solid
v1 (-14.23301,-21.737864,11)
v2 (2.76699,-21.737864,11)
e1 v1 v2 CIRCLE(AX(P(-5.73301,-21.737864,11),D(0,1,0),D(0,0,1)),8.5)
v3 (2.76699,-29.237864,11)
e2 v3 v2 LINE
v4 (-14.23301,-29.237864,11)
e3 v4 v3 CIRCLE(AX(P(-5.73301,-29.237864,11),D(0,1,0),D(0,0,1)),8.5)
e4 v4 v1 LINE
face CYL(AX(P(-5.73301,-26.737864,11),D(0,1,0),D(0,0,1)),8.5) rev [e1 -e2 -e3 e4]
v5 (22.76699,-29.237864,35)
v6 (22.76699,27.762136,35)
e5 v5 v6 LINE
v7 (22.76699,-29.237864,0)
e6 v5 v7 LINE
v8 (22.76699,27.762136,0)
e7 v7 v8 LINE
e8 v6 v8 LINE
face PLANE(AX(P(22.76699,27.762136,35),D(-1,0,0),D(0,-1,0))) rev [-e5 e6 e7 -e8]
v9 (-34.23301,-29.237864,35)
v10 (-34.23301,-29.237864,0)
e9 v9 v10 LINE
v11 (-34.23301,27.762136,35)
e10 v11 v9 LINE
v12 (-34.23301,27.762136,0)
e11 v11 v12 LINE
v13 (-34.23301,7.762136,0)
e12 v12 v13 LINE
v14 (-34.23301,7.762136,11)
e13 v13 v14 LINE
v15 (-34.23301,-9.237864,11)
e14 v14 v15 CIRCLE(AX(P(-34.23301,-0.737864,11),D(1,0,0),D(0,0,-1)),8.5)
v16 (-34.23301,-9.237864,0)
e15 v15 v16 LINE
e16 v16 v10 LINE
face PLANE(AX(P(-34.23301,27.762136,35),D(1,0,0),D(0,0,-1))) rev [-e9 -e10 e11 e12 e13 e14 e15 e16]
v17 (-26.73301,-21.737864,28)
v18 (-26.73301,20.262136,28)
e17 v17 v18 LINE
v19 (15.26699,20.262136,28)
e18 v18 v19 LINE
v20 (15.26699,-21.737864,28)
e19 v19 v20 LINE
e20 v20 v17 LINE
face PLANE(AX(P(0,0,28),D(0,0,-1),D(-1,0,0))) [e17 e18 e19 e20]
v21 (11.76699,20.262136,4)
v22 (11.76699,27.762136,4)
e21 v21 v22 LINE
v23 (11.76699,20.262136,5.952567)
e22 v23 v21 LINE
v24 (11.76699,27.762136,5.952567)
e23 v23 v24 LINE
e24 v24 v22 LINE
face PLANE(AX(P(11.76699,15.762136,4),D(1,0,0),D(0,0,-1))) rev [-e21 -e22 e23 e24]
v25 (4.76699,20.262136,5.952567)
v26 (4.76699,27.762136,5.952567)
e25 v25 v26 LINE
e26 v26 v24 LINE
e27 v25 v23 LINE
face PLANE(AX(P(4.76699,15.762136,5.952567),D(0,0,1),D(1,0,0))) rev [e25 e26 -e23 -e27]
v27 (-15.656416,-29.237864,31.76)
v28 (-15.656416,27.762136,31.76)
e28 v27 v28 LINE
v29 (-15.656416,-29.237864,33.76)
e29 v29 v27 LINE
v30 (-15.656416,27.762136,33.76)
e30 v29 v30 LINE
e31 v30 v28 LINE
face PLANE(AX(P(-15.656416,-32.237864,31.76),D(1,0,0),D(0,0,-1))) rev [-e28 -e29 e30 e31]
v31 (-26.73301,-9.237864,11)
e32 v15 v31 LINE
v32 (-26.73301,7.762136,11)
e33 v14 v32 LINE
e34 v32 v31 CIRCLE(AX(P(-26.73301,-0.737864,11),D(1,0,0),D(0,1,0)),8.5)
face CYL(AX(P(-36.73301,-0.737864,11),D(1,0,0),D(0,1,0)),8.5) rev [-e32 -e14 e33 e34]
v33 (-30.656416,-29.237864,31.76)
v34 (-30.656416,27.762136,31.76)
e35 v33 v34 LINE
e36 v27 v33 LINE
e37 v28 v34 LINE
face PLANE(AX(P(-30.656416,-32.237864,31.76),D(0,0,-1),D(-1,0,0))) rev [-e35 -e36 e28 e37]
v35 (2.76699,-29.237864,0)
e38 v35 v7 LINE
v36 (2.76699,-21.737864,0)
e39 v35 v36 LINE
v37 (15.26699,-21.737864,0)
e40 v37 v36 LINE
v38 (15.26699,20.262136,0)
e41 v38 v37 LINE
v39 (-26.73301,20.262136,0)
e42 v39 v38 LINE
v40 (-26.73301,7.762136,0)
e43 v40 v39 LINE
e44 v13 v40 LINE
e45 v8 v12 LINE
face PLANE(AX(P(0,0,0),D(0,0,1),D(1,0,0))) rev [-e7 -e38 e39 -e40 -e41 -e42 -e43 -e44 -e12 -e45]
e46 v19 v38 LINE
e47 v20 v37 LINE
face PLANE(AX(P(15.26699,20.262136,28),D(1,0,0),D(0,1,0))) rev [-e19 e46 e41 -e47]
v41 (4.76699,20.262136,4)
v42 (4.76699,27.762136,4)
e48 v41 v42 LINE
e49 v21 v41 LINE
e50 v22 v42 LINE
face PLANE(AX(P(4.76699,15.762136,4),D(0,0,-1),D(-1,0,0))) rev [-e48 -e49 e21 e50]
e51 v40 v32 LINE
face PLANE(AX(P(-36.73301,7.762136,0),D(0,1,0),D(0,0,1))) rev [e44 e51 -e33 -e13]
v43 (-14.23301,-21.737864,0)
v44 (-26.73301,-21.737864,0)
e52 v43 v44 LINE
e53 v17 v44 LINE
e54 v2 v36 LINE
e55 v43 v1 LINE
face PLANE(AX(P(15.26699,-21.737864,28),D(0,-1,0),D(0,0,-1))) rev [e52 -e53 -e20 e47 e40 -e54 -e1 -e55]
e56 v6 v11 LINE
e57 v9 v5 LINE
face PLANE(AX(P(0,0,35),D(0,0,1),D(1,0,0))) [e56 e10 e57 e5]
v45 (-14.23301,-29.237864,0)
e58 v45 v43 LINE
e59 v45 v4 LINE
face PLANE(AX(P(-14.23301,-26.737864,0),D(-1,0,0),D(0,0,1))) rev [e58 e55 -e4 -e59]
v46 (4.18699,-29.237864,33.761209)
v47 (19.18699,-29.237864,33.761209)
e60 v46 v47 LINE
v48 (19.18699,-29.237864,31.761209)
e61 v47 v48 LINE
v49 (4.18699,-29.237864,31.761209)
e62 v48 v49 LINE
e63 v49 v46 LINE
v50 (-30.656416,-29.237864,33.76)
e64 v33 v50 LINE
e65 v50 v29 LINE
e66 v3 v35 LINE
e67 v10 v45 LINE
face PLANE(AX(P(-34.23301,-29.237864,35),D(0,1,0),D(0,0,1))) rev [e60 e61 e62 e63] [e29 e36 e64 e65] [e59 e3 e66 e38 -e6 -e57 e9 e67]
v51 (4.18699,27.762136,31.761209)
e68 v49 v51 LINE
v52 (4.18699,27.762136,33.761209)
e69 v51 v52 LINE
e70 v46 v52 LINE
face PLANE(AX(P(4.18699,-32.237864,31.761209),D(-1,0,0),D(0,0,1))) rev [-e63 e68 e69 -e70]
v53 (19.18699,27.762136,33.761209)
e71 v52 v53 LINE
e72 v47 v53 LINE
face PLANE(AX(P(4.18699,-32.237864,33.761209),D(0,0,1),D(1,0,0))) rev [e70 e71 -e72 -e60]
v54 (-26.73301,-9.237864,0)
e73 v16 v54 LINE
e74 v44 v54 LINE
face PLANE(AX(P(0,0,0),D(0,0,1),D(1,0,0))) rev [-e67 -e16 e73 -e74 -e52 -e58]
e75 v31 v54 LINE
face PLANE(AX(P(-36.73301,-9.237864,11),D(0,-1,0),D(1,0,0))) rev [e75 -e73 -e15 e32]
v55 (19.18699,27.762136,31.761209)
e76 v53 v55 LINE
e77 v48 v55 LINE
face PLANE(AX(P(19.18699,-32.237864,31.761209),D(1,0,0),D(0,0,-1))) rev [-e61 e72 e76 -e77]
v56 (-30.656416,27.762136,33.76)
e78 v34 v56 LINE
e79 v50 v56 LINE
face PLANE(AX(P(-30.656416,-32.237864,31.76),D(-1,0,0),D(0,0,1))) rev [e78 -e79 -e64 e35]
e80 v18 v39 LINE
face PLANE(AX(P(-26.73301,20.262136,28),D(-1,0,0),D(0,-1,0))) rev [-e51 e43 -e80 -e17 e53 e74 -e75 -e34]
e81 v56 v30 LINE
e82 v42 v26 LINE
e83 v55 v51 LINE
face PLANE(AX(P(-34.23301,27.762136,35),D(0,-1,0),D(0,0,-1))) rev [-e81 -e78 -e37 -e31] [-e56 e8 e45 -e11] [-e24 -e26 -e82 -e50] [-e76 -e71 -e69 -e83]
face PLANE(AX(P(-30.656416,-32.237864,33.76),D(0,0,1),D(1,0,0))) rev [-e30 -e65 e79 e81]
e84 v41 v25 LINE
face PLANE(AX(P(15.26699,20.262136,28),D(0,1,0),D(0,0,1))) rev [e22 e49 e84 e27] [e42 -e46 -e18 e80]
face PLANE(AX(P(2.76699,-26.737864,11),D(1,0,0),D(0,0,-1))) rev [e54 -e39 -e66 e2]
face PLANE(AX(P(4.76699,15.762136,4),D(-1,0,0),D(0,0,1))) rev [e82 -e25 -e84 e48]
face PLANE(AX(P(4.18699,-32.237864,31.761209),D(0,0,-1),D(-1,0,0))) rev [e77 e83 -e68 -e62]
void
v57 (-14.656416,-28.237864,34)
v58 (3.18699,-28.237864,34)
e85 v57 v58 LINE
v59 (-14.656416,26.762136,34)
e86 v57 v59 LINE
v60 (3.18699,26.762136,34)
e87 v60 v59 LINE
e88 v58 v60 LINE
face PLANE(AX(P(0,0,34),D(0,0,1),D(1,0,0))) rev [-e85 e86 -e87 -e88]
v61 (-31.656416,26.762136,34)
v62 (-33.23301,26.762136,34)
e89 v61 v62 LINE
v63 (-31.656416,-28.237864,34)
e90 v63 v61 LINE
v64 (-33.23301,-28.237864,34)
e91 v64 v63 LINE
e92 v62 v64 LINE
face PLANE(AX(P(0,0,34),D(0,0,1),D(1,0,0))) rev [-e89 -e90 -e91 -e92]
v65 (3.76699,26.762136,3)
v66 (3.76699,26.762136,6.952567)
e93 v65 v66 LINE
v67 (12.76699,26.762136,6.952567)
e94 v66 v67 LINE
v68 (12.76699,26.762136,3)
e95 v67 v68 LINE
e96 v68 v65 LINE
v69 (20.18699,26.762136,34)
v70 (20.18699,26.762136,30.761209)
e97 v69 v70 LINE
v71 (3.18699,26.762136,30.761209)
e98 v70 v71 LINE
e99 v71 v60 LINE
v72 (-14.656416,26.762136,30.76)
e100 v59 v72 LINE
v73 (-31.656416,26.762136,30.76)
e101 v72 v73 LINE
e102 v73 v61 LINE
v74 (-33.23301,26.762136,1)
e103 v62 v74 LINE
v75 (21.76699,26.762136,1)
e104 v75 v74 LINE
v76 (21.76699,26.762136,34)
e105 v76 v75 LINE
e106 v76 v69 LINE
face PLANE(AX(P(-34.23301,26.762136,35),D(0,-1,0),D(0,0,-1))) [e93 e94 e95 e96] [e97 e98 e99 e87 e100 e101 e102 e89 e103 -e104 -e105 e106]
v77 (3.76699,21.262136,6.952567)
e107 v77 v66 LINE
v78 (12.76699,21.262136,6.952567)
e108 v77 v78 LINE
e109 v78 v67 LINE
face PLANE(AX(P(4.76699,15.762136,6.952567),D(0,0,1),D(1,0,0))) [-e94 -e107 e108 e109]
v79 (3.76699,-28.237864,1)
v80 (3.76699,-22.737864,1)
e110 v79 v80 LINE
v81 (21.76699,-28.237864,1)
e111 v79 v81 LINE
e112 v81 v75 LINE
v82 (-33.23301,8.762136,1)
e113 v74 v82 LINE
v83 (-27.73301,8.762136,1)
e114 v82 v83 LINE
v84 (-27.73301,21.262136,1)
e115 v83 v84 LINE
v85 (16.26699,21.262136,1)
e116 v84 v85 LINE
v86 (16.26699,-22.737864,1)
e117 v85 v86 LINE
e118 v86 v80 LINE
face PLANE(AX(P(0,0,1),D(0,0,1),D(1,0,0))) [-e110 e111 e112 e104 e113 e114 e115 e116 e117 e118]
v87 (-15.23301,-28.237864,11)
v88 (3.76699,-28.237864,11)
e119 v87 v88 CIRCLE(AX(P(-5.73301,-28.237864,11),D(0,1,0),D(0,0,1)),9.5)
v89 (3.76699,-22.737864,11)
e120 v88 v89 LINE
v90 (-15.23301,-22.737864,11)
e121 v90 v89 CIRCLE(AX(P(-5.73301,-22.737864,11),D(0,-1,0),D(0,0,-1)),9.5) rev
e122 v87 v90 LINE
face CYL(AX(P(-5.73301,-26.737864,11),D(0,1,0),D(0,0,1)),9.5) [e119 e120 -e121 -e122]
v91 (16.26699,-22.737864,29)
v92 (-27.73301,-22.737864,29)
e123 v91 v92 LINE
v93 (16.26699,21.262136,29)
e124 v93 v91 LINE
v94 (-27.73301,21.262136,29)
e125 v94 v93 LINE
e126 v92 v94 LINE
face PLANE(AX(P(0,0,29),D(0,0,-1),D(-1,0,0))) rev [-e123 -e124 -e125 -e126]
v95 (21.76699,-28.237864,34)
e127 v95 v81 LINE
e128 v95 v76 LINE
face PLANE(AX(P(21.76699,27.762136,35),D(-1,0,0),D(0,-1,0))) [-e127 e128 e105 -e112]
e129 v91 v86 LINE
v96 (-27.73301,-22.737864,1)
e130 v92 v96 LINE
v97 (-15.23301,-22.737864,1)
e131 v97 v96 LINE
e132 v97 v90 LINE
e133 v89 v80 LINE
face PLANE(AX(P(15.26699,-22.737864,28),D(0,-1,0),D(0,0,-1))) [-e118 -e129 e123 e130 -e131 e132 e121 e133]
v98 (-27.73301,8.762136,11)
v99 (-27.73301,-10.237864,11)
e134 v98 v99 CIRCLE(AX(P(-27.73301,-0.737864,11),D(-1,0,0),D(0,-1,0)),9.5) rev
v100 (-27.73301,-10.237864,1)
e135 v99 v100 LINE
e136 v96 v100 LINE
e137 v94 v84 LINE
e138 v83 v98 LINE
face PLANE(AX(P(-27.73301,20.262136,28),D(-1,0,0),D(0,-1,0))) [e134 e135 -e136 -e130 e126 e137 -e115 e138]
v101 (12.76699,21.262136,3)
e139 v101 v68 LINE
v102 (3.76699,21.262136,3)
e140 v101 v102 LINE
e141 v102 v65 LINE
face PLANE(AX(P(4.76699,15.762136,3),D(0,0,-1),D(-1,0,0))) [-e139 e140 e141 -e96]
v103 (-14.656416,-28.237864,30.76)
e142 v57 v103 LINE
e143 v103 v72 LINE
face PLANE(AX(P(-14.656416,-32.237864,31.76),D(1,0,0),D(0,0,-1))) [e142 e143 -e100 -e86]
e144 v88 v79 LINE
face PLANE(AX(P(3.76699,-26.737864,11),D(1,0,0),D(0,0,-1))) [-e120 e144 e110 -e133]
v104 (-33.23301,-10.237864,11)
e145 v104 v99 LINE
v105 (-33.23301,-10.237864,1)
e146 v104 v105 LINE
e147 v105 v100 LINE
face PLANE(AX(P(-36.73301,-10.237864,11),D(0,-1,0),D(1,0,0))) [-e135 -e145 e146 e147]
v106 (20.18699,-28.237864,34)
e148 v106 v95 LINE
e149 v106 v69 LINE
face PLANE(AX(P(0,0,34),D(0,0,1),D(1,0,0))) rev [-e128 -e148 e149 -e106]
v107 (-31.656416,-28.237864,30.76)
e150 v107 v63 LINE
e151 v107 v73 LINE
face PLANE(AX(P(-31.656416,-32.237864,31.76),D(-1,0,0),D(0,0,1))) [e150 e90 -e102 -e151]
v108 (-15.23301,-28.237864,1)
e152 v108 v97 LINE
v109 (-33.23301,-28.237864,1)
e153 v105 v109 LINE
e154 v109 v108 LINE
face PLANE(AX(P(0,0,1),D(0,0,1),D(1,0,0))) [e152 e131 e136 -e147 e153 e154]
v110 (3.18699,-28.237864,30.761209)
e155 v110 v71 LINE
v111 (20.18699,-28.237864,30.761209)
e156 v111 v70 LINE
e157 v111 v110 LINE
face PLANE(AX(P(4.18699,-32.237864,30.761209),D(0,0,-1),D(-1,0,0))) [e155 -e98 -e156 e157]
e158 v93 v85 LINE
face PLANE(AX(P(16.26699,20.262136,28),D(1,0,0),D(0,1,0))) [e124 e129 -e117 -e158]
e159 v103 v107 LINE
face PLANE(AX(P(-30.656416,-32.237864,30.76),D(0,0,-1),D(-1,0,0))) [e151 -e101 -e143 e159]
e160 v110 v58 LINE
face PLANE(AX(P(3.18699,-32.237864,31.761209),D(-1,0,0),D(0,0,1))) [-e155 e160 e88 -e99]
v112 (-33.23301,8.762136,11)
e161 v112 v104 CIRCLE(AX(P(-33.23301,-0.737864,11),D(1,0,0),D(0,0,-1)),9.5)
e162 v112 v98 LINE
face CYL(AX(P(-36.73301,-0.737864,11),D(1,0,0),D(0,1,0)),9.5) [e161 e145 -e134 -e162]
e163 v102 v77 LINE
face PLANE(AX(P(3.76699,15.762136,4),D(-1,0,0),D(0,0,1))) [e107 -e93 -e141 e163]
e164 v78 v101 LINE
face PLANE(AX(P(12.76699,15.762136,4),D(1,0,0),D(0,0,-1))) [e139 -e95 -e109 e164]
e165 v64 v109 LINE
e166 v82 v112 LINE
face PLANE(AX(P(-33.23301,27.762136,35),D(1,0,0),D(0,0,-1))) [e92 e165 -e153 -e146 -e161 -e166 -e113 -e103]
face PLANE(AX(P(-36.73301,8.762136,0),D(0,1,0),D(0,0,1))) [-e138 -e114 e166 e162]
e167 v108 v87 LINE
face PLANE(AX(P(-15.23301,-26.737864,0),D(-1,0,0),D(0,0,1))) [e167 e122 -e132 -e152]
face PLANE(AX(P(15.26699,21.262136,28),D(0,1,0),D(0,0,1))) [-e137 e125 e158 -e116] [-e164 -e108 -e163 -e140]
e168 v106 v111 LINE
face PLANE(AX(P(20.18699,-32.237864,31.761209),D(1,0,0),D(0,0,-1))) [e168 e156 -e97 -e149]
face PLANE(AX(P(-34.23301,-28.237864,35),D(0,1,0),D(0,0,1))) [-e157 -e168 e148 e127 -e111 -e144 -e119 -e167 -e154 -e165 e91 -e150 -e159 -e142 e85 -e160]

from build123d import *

# Parameters (mm, degrees)
SKETCH2_W           = 57
SKETCH2_H           = 57
BOSS_EXTRUDE1_DEPTH = 35
SKETCH3_W           = 15
SKETCH3_H           = 2
CUT_EXTRUDE1_DEPTH  = 60
SKETCH4_W           = 42
SKETCH4_H           = 42
CUT_EXTRUDE2_DEPTH  = 28
CUT_EXTRUDE4_DEPTH  = 5
CUT_EXTRUDE5_DEPTH  = 10
CUT_EXTRUDE6_DEPTH  = 5
SKETCH13_W          = 7
SKETCH13_H          = 1.952566844
CUT_EXTRUDE8_DEPTH  = 12
SHELL3_START        = 21.262135922
SHELL3_OUTLINE_W    = 9
SHELL3_OUTLINE_H    = 3.952566844
SHELL3_DEPTH        = 5.5
SHELL3_START_2      = -28.237864078
SHELL3_2_DEPTH      = 18
SHELL3_START_3      = 8.762135922
SHELL3_3_DEPTH      = 12.5
SHELL3_4_DEPTH      = 5.5
SHELL3_START_4      = 16.266990291
SHELL3_5_OUTLINE_W  = 19
SHELL3_5_OUTLINE_H  = 29.761209032
SHELL3_5_DEPTH      = 5.5
SHELL3_START_5      = -14.656416284
SHELL3_6_OUTLINE_W  = 19
SHELL3_6_OUTLINE_H  = 5
SHELL3_6_DEPTH      = 17.843406575
SHELL3_START_6      = -33.233009709
SHELL3_7_DEPTH      = 5.5
SHELL3_START_7      = -27.733009709
SHELL3_8_OUTLINE_W  = 19
SHELL3_8_OUTLINE_H  = 1.76
SHELL3_8_DEPTH      = 44
SHELL3_START_8      = 20.186990291
SHELL3_9_OUTLINE_W  = 19
SHELL3_9_OUTLINE_H  = 3.238790968
SHELL3_9_DEPTH      = 1.58
SHELL3_10_OUTLINE_W = 19
SHELL3_10_OUTLINE_H = 3.24
SHELL3_10_DEPTH     = 1.576593425
SHELL3_START_9      = 3.186990291
SHELL3_11_OUTLINE_W = 19
SHELL3_11_OUTLINE_H = 0.001209032
SHELL3_11_DEPTH     = 13.08


with BuildPart() as part:
    # Sketch2 → Boss-Extrude1 (new body)
    with BuildSketch(Plane.XY):
        with Locations((-5.733009709, -0.737864078)):
            Rectangle(SKETCH2_W, SKETCH2_H)
    extrude(amount=BOSS_EXTRUDE1_DEPTH)

    # Sketch3 → Cut-Extrude1 (cut)
    with BuildSketch(Plane(origin=(0, 27.762135922, 0), x_dir=(1, 0, 0), z_dir=(0, 1, 0))):
        with Locations((-23.156416284, -32.76)):
            Rectangle(SKETCH3_W, SKETCH3_H)
        with Locations((11.686990291, -32.761209032)):
            Rectangle(SKETCH3_W, SKETCH3_H)
    extrude(amount=-CUT_EXTRUDE1_DEPTH, mode=Mode.SUBTRACT)

    # Sketch4 → Cut-Extrude2 (cut)
    with BuildSketch(Plane(origin=(0, 0, 0), x_dir=(-1, 0, 0), z_dir=(0, 0, -1))):
        with Locations((5.733009709, -0.737864078)):
            Rectangle(SKETCH4_W, SKETCH4_H)
    extrude(amount=-CUT_EXTRUDE2_DEPTH, mode=Mode.SUBTRACT)

    # Sketch5 → Cut-Extrude4 (cut)
    with BuildSketch(Plane(origin=(0, -21.737864078, 0), x_dir=(1, 0, 0), z_dir=(0, 1, 0))):
        with BuildLine():
            Line((2.766990291, -11), (2.766990291, 0))
            Line((2.766990291, 0), (-14.233009709, 0))
            Line((-14.233009709, 0), (-14.233009709, -11))
            ThreePointArc((-14.233009709, -11), (-5.733009709, -19.5), (2.766990291, -11))
        make_face()
    extrude(amount=-CUT_EXTRUDE4_DEPTH, mode=Mode.SUBTRACT)

    # Sketch7 → Cut-Extrude5 (cut)
    with BuildSketch(Plane(origin=(-26.733009709, 0, 0), x_dir=(0, 0, -1), z_dir=(1, 0, 0))):
        with BuildLine():
            Line((-11, -9.237864078), (0, -9.237864078))
            Line((0, -9.237864078), (0, 7.762135922))
            Line((0, 7.762135922), (-11, 7.762135922))
            ThreePointArc((-11, 7.762135922), (-19.5, -0.737864078), (-11, -9.237864078))
        make_face()
    extrude(amount=-CUT_EXTRUDE5_DEPTH, mode=Mode.SUBTRACT)

    # Sketch8 → Cut-Extrude6 (cut)
    with BuildSketch(Plane(origin=(0, -26.737864078, 0), x_dir=(1, 0, 0), z_dir=(0, 1, 0))):
        with BuildLine():
            Line((-14.233009709, 0), (2.766990291, 0))
            Line((2.766990291, 0), (2.766990291, -11))
            ThreePointArc((2.766990291, -11), (-5.733009709, -19.5), (-14.233009709, -11))
            Line((-14.233009709, -11), (-14.233009709, 0))
        make_face()
    extrude(amount=-CUT_EXTRUDE6_DEPTH, mode=Mode.SUBTRACT)

    # Sketch13 → Cut-Extrude8 (cut)
    with BuildSketch(Plane(origin=(0, 27.762135922, 0), x_dir=(1, 0, 0), z_dir=(0, 1, 0))):
        with Locations((8.266990291, -4.976283422)):
            Rectangle(SKETCH13_W, SKETCH13_H)
    extrude(amount=-CUT_EXTRUDE8_DEPTH, mode=Mode.SUBTRACT)

    # Shell3: read off the stored shape, not the designer's step
    # Shell3 outline → Shell3 (cut)
    with BuildSketch(Plane(origin=(0, 0, 0), x_dir=(1, 0, 0), z_dir=(0, 1, 0)).offset(SHELL3_START)):
        Polygon((-14.656416284, -30.76), (-14.656416284, -34), (3.186990291, -34), (3.186990291, -30.761209032), (20.186990291, -30.761209032), (20.186990291, -34), (21.766990291, -34), (21.766990291, -1), (-33.233009709, -1), (-33.233009709, -34), (-31.656416284, -34), (-31.656416284, -30.76), align=None)
        with Locations((8.266990291, -4.976283422)):
            Rectangle(SHELL3_OUTLINE_W, SHELL3_OUTLINE_H, mode=Mode.SUBTRACT)
    extrude(amount=SHELL3_DEPTH, mode=Mode.SUBTRACT)

    # Shell3 2 outline → Shell3 2 (cut)
    with BuildSketch(Plane(origin=(0, 0, 0), x_dir=(1, 0, 0), z_dir=(0, 1, 0)).offset(SHELL3_START_2)):
        Polygon((-14.656416284, -30.76), (-14.656416284, -34), (3.186990291, -34), (3.186990291, -30.761209032), (20.186990291, -30.761209032), (20.186990291, -34), (21.766990291, -34), (21.766990291, -1), (16.266990291, -1), (16.266990291, -29), (-27.733009709, -29), (-27.733009709, -1), (-33.233009709, -1), (-33.233009709, -34), (-31.656416284, -34), (-31.656416284, -30.76), align=None)
    extrude(amount=SHELL3_2_DEPTH, mode=Mode.SUBTRACT)

    # Shell3 3 outline → Shell3 3 (cut)
    with BuildSketch(Plane(origin=(0, 0, 0), x_dir=(1, 0, 0), z_dir=(0, 1, 0)).offset(SHELL3_START_3)):
        Polygon((-14.656416284, -30.76), (-14.656416284, -34), (3.186990291, -34), (3.186990291, -30.761209032), (20.186990291, -30.761209032), (20.186990291, -34), (21.766990291, -34), (21.766990291, -1), (16.266990291, -1), (16.266990291, -29), (-27.733009709, -29), (-27.733009709, -1), (-33.233009709, -1), (-33.233009709, -34), (-31.656416284, -34), (-31.656416284, -30.76), align=None)
    extrude(amount=SHELL3_3_DEPTH, mode=Mode.SUBTRACT)

    # Shell3 4 outline → Shell3 4 (cut)
    with BuildSketch(Plane(origin=(0, 0, 0), x_dir=(1, 0, 0), z_dir=(0, 1, 0)).offset(SHELL3_START_2)):
        with BuildLine():
            Line((-15.233009709, -1), (-27.733009709, -1))
            Line((-27.733009709, -1), (-27.733009709, -29))
            Line((-27.733009709, -29), (16.266990291, -29))
            Line((16.266990291, -29), (16.266990291, -1))
            Line((16.266990291, -1), (3.766990291, -1))
            Line((3.766990291, -1), (3.766990291, -11))
            ThreePointArc((3.766990291, -11), (-5.733009709, -20.5), (-15.233009709, -11))
            Line((-15.233009709, -11), (-15.233009709, -1))
        make_face()
    extrude(amount=SHELL3_4_DEPTH, mode=Mode.SUBTRACT)

    # Shell3 5 outline → Shell3 5 (cut)
    with BuildSketch(Plane.YZ.offset(SHELL3_START_4)):
        with Locations((-0.737864078, 15.880604516)):
            Rectangle(SHELL3_5_OUTLINE_W, SHELL3_5_OUTLINE_H)
    extrude(amount=SHELL3_5_DEPTH, mode=Mode.SUBTRACT)

    # Shell3 6 outline → Shell3 6 (cut)
    with BuildSketch(Plane.YZ.offset(SHELL3_START_5)):
        with Locations((-0.737864078, 31.5)):
            Rectangle(SHELL3_6_OUTLINE_W, SHELL3_6_OUTLINE_H)
    extrude(amount=SHELL3_6_DEPTH, mode=Mode.SUBTRACT)

    # Shell3 7 outline → Shell3 7 (cut)
    with BuildSketch(Plane.YZ.offset(SHELL3_START_6)):
        with BuildLine():
            Line((8.762135922, 30.76), (-10.237864078, 30.76))
            Line((-10.237864078, 30.76), (-10.237864078, 11))
            ThreePointArc((-10.237864078, 11), (-0.737864078, 20.5), (8.762135922, 11))
            Line((8.762135922, 11), (8.762135922, 30.76))
        make_face()
    extrude(amount=SHELL3_7_DEPTH, mode=Mode.SUBTRACT)

    # Shell3 8 outline → Shell3 8 (cut)
    with BuildSketch(Plane.YZ.offset(SHELL3_START_7)):
        with Locations((-0.737864078, 29.88)):
            Rectangle(SHELL3_8_OUTLINE_W, SHELL3_8_OUTLINE_H)
    extrude(amount=SHELL3_8_DEPTH, mode=Mode.SUBTRACT)

    # Shell3 9 outline → Shell3 9 (cut)
    with BuildSketch(Plane.YZ.offset(SHELL3_START_8)):
        with Locations((-0.737864078, 32.380604516)):
            Rectangle(SHELL3_9_OUTLINE_W, SHELL3_9_OUTLINE_H)
    extrude(amount=SHELL3_9_DEPTH, mode=Mode.SUBTRACT)

    # Shell3 10 outline → Shell3 10 (cut)
    with BuildSketch(Plane.YZ.offset(SHELL3_START_6)):
        with Locations((-0.737864078, 32.38)):
            Rectangle(SHELL3_10_OUTLINE_W, SHELL3_10_OUTLINE_H)
    extrude(amount=SHELL3_10_DEPTH, mode=Mode.SUBTRACT)

    # Shell3 11 outline → Shell3 11 (cut)
    with BuildSketch(Plane.YZ.offset(SHELL3_START_9)):
        with Locations((-0.737864078, 30.760604516)):
            Rectangle(SHELL3_11_OUTLINE_W, SHELL3_11_OUTLINE_H)
    extrude(amount=SHELL3_11_DEPTH, mode=Mode.SUBTRACT)


solid = part.part
